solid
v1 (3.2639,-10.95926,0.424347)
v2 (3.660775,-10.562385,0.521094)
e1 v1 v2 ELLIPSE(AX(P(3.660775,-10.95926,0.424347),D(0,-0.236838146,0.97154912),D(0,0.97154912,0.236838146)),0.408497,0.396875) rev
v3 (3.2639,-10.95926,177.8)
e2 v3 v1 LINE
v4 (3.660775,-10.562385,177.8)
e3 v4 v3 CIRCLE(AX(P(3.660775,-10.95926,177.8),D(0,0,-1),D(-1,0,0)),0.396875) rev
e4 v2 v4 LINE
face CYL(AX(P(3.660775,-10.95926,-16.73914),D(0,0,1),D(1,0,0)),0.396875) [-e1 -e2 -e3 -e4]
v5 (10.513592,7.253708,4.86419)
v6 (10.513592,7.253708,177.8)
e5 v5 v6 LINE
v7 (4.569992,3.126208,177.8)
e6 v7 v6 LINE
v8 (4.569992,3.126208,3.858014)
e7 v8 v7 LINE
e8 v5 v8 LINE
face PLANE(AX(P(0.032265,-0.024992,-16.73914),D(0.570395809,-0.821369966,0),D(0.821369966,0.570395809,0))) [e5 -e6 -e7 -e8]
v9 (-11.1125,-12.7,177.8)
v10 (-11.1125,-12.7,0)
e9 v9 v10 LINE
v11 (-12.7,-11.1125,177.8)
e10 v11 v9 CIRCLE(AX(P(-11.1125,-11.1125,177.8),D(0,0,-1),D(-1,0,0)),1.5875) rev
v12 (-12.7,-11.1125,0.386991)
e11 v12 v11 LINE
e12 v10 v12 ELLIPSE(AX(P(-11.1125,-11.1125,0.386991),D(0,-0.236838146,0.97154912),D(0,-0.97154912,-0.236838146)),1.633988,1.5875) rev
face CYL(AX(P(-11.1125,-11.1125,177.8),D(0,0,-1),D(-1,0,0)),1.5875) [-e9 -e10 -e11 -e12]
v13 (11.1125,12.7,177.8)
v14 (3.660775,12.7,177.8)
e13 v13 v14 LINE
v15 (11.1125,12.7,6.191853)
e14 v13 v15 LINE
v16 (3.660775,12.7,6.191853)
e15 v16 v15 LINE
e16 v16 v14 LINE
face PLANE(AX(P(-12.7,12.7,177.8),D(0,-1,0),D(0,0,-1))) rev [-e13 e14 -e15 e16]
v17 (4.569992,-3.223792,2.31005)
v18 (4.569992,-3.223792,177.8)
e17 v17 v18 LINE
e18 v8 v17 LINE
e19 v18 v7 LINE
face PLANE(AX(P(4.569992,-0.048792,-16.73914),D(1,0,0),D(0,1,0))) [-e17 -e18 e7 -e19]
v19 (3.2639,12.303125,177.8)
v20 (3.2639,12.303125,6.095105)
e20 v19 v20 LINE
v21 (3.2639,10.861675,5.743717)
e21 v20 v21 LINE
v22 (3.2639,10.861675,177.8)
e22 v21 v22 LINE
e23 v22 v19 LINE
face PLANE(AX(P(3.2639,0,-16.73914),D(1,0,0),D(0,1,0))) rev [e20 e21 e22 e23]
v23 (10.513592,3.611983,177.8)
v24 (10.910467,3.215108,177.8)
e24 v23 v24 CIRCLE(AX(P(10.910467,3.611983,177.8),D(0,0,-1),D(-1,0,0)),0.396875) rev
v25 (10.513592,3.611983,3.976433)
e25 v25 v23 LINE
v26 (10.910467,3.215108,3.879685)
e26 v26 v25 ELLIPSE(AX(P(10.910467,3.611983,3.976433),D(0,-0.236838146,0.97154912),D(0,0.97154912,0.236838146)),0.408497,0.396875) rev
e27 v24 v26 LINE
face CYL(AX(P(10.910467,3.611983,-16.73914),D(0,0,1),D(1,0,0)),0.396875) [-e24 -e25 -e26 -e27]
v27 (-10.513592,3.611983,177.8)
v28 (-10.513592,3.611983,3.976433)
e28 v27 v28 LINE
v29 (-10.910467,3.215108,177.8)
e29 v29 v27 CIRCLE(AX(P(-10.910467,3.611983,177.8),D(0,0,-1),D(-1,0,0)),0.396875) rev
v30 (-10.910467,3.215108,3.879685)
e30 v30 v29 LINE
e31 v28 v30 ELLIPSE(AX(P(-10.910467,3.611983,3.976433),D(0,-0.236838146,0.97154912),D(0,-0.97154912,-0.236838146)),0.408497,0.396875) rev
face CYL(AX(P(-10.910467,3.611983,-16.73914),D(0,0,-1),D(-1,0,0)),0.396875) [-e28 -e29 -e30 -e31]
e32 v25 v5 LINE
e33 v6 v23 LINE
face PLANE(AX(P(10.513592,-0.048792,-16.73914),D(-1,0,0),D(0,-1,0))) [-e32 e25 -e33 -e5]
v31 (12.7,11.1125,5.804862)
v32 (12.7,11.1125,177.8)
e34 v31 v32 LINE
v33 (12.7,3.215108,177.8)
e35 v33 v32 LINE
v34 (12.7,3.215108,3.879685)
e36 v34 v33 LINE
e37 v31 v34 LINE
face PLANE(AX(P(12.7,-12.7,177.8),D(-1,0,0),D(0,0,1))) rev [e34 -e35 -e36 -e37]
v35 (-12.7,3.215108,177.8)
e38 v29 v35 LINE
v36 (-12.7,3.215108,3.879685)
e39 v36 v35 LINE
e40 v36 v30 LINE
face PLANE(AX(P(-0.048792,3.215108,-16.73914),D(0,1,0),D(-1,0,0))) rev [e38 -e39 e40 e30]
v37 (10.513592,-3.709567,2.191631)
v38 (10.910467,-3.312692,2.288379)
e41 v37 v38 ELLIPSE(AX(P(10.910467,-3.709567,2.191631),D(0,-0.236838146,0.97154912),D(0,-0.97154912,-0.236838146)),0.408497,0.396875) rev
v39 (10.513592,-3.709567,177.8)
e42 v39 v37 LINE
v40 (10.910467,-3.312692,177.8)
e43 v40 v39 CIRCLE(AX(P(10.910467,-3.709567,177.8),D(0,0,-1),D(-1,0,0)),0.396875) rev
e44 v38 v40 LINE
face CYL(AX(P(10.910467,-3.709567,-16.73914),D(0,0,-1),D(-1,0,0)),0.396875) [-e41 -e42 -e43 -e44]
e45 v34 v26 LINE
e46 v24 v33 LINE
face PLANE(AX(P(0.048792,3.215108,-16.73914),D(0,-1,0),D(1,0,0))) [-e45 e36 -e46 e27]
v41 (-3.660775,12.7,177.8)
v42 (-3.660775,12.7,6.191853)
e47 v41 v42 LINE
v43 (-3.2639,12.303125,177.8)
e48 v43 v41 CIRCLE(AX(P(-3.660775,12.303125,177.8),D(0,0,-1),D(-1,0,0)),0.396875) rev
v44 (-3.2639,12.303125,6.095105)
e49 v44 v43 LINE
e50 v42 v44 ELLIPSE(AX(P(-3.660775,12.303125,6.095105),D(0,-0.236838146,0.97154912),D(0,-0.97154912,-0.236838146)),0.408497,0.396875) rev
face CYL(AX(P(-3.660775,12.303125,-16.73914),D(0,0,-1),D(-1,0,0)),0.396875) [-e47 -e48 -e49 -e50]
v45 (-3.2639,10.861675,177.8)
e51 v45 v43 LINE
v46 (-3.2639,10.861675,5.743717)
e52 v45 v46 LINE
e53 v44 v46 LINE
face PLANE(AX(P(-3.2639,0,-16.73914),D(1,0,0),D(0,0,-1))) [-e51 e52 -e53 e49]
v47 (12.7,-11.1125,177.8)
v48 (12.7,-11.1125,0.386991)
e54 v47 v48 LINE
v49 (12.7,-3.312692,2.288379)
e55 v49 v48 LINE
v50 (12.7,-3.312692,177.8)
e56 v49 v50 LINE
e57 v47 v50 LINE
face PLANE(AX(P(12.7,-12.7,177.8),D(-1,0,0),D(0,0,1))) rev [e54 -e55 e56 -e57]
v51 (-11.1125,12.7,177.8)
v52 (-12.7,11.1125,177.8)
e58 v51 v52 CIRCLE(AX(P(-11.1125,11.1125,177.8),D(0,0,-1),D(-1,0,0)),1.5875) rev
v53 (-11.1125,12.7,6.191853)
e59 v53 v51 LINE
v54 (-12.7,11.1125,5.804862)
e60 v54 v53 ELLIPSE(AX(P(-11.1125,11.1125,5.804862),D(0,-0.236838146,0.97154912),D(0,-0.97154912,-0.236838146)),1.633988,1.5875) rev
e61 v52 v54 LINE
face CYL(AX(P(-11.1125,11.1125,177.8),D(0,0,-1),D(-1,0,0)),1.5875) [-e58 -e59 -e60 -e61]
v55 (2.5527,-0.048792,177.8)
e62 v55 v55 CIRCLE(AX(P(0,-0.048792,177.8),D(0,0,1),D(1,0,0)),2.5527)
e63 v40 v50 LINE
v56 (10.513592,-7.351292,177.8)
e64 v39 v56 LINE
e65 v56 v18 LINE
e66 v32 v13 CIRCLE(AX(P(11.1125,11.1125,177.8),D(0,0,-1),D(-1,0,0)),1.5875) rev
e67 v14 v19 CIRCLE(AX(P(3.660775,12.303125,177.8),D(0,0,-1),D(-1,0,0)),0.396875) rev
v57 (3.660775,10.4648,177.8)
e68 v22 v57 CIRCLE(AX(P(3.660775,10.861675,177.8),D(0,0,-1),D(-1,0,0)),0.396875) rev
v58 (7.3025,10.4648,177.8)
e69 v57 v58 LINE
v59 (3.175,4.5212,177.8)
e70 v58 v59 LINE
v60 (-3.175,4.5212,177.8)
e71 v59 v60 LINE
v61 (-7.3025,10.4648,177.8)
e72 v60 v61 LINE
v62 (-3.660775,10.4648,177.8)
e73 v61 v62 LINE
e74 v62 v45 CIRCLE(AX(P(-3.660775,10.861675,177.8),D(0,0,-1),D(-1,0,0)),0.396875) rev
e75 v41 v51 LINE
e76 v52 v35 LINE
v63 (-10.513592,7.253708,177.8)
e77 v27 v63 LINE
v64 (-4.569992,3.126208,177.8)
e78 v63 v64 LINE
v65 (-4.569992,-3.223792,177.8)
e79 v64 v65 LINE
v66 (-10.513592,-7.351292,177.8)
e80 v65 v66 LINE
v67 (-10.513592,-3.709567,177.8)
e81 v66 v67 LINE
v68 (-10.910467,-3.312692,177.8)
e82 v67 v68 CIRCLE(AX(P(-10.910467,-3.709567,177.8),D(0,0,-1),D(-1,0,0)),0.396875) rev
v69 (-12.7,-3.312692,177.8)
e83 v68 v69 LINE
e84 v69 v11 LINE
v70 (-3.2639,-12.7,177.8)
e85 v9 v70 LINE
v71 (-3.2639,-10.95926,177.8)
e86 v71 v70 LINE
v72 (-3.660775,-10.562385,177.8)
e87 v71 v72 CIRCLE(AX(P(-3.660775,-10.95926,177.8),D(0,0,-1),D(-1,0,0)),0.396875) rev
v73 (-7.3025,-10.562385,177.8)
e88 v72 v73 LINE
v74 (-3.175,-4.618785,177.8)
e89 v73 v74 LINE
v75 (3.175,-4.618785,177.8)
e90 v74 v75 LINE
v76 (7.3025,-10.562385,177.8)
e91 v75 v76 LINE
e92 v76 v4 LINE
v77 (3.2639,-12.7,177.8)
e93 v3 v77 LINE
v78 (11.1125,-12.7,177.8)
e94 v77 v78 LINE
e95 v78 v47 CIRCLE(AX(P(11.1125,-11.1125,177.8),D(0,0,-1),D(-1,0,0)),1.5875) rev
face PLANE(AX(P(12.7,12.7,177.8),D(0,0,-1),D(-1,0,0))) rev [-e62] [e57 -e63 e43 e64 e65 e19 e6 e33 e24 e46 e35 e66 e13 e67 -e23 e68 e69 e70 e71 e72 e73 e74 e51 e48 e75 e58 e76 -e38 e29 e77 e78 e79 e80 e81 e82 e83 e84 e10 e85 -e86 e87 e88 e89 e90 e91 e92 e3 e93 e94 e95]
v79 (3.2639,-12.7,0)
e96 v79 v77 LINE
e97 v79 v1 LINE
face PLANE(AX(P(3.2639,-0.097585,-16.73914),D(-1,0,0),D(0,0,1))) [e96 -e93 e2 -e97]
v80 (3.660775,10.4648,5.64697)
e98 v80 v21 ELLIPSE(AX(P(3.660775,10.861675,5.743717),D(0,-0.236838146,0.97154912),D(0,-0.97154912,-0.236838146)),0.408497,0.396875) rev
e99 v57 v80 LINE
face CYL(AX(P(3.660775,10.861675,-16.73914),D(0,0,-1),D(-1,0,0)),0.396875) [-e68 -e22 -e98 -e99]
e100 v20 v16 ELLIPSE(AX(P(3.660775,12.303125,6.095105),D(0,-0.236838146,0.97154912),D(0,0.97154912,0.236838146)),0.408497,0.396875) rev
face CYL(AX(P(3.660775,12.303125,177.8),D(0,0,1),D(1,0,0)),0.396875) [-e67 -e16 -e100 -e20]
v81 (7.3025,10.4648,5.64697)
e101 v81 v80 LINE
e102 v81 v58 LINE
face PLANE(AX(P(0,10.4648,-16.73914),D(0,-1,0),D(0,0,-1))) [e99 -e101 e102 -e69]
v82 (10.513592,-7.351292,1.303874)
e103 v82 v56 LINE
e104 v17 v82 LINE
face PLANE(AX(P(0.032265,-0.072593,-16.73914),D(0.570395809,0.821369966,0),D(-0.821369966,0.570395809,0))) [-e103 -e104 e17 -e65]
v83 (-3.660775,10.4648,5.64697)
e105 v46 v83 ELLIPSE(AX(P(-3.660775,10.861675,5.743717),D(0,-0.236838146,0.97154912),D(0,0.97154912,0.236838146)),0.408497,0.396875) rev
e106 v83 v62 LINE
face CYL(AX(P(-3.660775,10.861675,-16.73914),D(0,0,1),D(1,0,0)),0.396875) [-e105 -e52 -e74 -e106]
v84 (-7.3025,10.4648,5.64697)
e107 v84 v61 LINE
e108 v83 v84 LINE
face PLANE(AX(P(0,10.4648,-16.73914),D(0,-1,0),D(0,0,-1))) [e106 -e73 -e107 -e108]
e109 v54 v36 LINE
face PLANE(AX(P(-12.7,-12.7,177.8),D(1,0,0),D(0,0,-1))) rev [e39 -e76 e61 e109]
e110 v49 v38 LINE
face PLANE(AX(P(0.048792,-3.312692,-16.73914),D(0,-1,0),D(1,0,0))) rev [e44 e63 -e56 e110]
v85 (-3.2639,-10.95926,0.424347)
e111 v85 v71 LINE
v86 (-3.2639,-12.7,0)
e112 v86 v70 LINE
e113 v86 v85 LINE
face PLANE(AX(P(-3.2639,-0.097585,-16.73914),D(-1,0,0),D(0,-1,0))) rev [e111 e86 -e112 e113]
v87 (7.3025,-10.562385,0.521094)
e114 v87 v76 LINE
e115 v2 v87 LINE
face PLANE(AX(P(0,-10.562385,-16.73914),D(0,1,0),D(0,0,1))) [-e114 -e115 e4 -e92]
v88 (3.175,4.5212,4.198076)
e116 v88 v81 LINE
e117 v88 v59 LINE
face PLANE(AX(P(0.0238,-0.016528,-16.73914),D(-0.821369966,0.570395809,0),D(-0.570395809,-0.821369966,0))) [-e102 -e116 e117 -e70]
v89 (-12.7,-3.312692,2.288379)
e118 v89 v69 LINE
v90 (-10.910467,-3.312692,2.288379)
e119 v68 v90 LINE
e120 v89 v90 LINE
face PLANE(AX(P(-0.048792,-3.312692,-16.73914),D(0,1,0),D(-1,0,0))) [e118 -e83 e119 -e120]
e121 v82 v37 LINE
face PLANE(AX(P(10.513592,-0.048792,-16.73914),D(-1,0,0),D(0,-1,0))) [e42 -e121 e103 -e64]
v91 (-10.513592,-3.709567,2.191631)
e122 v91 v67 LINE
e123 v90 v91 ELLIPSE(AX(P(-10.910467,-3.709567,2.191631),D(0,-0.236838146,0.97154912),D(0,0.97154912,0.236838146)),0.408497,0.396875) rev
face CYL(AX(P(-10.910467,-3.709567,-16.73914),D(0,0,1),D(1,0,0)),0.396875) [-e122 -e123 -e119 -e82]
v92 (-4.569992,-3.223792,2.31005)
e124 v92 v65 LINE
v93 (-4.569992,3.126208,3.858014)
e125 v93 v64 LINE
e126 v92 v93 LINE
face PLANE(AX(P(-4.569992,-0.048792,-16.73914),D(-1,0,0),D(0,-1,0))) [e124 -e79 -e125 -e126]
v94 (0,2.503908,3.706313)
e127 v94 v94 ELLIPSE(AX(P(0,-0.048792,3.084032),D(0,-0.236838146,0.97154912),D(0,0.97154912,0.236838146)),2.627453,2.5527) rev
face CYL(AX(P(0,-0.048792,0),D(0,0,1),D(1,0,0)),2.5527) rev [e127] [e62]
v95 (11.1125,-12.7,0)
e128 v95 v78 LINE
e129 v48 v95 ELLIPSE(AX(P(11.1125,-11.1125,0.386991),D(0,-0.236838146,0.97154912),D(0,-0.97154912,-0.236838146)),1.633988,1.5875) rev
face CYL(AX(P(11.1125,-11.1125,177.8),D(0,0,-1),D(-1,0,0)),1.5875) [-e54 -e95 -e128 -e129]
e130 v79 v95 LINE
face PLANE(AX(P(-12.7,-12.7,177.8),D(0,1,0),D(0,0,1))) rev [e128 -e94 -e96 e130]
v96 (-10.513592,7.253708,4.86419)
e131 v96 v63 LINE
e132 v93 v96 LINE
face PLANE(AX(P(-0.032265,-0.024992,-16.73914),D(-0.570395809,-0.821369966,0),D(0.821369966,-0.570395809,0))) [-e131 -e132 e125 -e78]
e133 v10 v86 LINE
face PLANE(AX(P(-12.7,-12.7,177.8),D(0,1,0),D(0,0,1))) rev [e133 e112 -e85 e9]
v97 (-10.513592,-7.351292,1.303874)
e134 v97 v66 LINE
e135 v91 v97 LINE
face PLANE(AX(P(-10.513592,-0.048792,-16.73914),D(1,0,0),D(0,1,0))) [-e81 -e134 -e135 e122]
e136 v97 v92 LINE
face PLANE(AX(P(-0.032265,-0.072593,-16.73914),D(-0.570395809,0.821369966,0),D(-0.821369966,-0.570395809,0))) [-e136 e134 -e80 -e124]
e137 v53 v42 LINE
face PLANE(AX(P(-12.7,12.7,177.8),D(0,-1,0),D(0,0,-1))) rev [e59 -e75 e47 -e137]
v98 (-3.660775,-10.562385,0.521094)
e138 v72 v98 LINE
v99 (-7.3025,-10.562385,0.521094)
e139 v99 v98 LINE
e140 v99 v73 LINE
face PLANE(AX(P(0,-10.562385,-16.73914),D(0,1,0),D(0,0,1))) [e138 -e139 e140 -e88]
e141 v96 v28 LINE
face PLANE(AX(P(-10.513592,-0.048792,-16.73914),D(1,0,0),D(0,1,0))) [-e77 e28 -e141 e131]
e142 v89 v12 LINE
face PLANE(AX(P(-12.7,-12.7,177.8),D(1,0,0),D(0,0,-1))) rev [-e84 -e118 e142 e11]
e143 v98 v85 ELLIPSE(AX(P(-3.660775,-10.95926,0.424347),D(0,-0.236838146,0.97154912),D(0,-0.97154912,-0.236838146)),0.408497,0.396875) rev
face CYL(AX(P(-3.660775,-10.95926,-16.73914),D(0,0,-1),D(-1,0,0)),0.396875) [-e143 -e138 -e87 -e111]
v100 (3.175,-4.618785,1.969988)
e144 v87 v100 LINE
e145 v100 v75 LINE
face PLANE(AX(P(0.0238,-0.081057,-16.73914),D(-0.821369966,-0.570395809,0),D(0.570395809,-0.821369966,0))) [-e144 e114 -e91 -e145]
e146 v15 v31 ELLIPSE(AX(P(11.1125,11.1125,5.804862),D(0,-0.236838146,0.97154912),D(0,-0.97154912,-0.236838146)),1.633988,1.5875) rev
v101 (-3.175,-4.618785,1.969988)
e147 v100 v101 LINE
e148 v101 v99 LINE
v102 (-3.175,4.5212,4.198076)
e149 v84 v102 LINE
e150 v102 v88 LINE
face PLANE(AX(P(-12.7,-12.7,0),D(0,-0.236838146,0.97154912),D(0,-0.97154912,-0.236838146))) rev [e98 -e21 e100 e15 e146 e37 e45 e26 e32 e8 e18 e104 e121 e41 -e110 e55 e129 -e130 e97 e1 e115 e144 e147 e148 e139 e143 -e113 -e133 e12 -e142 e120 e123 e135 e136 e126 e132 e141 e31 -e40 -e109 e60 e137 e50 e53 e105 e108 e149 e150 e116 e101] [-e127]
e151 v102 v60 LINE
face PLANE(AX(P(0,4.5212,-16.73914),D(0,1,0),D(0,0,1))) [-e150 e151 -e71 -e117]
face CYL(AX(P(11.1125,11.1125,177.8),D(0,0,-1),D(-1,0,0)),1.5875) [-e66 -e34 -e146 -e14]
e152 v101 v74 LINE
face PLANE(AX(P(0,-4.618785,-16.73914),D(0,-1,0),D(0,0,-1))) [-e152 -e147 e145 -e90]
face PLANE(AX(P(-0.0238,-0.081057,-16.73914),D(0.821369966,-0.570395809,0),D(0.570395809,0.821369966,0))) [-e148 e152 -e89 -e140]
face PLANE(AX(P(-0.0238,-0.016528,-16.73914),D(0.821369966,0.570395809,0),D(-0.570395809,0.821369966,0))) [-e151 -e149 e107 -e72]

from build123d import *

# Parameters (mm, degrees)
SKETCH1_W           = 25.4
SKETCH1_H           = 25.4
BOSS_EXTRUDE1_DEPTH = 177.8
FILLET1_R           = 1.5875
HOLE1_OUTLINE_R     = 2.5527
HOLE1_DEPTH         = 177.8
SKETCH7_W           = 6.5278
SKETCH7_H           = 2.2352
CUT_EXTRUDE2_DEPTH  = 177.8
FILLET4_R           = 0.396875
CIRPATTERN2_DEPTH   = 177.8
CUT_EXTRUDE3_DEPTH  = 181.05357536


# Read off the part's stored shape, not the designer's step: Hole1, CirPattern2
with BuildPart() as part:
    # Sketch1 → Boss-Extrude1 (new body)
    with BuildSketch(Plane.XY):
        Rectangle(SKETCH1_W, SKETCH1_H)
    extrude(amount=BOSS_EXTRUDE1_DEPTH)

    # Fillet1
    fillet1_edges = [part.edges().sort_by_distance(p)[0] for p in [
        (12.7, -12.7, 88.9),
        (-12.7, -12.7, 88.9),
        (-12.7, 12.7, 88.9),
        (12.7, 12.7, 88.9),
    ]]
    fillet(fillet1_edges, radius=FILLET1_R)

    # Hole1 outline → Hole1 (cut)
    with BuildSketch(Plane.XY):
        with Locations((0, -0.048792482)):
            Circle(HOLE1_OUTLINE_R)
    extrude(amount=HOLE1_DEPTH, mode=Mode.SUBTRACT)

    # Sketch7 → Cut-Extrude2 (cut)
    with BuildSketch(Plane.XY.offset(177.8)):
        with Locations((0, 11.5824)):
            Rectangle(SKETCH7_W, SKETCH7_H)
        Polygon((-3.175, 4.5212), (-7.3025, 10.4648), (7.3025, 10.4648), (3.175, 4.5212), align=None)
    extrude(amount=-CUT_EXTRUDE2_DEPTH, mode=Mode.SUBTRACT)

    # Fillet4
    fillet4_edges = [part.edges().sort_by_distance(p)[0] for p in [
        (-3.2639, 10.4648, 88.9),
        (-3.2639, 12.7, 88.9),
        (3.2639, 12.7, 88.9),
        (3.2639, 10.4648, 88.9),
    ]]
    fillet(fillet4_edges, radius=FILLET4_R)

    # CirPattern2 outline → CirPattern2 (cut)
    with BuildSketch(Plane.XY):
        with BuildLine():
            ThreePointArc((-3.660775, -10.562384964), (-3.380141996, -10.67862696), (-3.2639, -10.959259964))
            Line((-3.2639, -10.959259964), (-3.2639, -12.7))
            Line((-3.2639, -12.7), (3.2639, -12.7))
            Line((3.2639, -12.7), (3.2639, -10.959259964))
            ThreePointArc((3.2639, -10.959259964), (3.380141996, -10.67862696), (3.660775, -10.562384964))
            Line((3.660775, -10.562384964), (7.3025, -10.562384964))
            Line((7.3025, -10.562384964), (3.175, -4.618784964))
            Line((3.175, -4.618784964), (-3.175, -4.618784964))
            Line((-3.175, -4.618784964), (-7.3025, -10.562384964))
            Line((-7.3025, -10.562384964), (-3.660775, -10.562384964))
        make_face()
        with BuildLine():
            Line((-12.7, -3.312692482), (-10.910467482, -3.312692482))
            ThreePointArc((-10.910467482, -3.312692482), (-10.629834478, -3.428934478), (-10.513592482, -3.709567482))
            Line((-10.513592482, -3.709567482), (-10.513592482, -7.351292482))
            Line((-10.513592482, -7.351292482), (-4.569992482, -3.223792482))
            Line((-4.569992482, -3.223792482), (-4.569992482, 3.126207518))
            Line((-4.569992482, 3.126207518), (-10.513592482, 7.253707518))
            Line((-10.513592482, 7.253707518), (-10.513592482, 3.611982518))
            ThreePointArc((-10.513592482, 3.611982518), (-10.629834478, 3.331349514), (-10.910467482, 3.215107518))
            Line((-10.910467482, 3.215107518), (-12.7, 3.215107518))
            Line((-12.7, 3.215107518), (-12.7, -3.312692482))
        make_face()
        with BuildLine():
            ThreePointArc((10.513592482, -3.709567482), (10.629834478, -3.428934478), (10.910467482, -3.312692482))
            Line((10.910467482, -3.312692482), (12.7, -3.312692482))
            Line((12.7, -3.312692482), (12.7, 3.215107518))
            Line((12.7, 3.215107518), (10.910467482, 3.215107518))
            ThreePointArc((10.910467482, 3.215107518), (10.629834478, 3.331349514), (10.513592482, 3.611982518))
            Line((10.513592482, 3.611982518), (10.513592482, 7.253707518))
            Line((10.513592482, 7.253707518), (4.569992482, 3.126207518))
            Line((4.569992482, 3.126207518), (4.569992482, -3.223792482))
            Line((4.569992482, -3.223792482), (10.513592482, -7.351292482))
            Line((10.513592482, -7.351292482), (10.513592482, -3.709567482))
        make_face()
    extrude(amount=CIRPATTERN2_DEPTH, mode=Mode.SUBTRACT)

    # Sketch8 → Cut-Extrude3 (cut, through all)
    with BuildSketch(Plane(origin=(12.7, 0, 0), x_dir=(0, 0, -1), z_dir=(1, 0, 0))):
        Polygon((0, 12.7), (0, -12.7), (-6.191852564, 12.7), align=None)
    extrude(amount=-CUT_EXTRUDE3_DEPTH, mode=Mode.SUBTRACT)


solid = part.part
